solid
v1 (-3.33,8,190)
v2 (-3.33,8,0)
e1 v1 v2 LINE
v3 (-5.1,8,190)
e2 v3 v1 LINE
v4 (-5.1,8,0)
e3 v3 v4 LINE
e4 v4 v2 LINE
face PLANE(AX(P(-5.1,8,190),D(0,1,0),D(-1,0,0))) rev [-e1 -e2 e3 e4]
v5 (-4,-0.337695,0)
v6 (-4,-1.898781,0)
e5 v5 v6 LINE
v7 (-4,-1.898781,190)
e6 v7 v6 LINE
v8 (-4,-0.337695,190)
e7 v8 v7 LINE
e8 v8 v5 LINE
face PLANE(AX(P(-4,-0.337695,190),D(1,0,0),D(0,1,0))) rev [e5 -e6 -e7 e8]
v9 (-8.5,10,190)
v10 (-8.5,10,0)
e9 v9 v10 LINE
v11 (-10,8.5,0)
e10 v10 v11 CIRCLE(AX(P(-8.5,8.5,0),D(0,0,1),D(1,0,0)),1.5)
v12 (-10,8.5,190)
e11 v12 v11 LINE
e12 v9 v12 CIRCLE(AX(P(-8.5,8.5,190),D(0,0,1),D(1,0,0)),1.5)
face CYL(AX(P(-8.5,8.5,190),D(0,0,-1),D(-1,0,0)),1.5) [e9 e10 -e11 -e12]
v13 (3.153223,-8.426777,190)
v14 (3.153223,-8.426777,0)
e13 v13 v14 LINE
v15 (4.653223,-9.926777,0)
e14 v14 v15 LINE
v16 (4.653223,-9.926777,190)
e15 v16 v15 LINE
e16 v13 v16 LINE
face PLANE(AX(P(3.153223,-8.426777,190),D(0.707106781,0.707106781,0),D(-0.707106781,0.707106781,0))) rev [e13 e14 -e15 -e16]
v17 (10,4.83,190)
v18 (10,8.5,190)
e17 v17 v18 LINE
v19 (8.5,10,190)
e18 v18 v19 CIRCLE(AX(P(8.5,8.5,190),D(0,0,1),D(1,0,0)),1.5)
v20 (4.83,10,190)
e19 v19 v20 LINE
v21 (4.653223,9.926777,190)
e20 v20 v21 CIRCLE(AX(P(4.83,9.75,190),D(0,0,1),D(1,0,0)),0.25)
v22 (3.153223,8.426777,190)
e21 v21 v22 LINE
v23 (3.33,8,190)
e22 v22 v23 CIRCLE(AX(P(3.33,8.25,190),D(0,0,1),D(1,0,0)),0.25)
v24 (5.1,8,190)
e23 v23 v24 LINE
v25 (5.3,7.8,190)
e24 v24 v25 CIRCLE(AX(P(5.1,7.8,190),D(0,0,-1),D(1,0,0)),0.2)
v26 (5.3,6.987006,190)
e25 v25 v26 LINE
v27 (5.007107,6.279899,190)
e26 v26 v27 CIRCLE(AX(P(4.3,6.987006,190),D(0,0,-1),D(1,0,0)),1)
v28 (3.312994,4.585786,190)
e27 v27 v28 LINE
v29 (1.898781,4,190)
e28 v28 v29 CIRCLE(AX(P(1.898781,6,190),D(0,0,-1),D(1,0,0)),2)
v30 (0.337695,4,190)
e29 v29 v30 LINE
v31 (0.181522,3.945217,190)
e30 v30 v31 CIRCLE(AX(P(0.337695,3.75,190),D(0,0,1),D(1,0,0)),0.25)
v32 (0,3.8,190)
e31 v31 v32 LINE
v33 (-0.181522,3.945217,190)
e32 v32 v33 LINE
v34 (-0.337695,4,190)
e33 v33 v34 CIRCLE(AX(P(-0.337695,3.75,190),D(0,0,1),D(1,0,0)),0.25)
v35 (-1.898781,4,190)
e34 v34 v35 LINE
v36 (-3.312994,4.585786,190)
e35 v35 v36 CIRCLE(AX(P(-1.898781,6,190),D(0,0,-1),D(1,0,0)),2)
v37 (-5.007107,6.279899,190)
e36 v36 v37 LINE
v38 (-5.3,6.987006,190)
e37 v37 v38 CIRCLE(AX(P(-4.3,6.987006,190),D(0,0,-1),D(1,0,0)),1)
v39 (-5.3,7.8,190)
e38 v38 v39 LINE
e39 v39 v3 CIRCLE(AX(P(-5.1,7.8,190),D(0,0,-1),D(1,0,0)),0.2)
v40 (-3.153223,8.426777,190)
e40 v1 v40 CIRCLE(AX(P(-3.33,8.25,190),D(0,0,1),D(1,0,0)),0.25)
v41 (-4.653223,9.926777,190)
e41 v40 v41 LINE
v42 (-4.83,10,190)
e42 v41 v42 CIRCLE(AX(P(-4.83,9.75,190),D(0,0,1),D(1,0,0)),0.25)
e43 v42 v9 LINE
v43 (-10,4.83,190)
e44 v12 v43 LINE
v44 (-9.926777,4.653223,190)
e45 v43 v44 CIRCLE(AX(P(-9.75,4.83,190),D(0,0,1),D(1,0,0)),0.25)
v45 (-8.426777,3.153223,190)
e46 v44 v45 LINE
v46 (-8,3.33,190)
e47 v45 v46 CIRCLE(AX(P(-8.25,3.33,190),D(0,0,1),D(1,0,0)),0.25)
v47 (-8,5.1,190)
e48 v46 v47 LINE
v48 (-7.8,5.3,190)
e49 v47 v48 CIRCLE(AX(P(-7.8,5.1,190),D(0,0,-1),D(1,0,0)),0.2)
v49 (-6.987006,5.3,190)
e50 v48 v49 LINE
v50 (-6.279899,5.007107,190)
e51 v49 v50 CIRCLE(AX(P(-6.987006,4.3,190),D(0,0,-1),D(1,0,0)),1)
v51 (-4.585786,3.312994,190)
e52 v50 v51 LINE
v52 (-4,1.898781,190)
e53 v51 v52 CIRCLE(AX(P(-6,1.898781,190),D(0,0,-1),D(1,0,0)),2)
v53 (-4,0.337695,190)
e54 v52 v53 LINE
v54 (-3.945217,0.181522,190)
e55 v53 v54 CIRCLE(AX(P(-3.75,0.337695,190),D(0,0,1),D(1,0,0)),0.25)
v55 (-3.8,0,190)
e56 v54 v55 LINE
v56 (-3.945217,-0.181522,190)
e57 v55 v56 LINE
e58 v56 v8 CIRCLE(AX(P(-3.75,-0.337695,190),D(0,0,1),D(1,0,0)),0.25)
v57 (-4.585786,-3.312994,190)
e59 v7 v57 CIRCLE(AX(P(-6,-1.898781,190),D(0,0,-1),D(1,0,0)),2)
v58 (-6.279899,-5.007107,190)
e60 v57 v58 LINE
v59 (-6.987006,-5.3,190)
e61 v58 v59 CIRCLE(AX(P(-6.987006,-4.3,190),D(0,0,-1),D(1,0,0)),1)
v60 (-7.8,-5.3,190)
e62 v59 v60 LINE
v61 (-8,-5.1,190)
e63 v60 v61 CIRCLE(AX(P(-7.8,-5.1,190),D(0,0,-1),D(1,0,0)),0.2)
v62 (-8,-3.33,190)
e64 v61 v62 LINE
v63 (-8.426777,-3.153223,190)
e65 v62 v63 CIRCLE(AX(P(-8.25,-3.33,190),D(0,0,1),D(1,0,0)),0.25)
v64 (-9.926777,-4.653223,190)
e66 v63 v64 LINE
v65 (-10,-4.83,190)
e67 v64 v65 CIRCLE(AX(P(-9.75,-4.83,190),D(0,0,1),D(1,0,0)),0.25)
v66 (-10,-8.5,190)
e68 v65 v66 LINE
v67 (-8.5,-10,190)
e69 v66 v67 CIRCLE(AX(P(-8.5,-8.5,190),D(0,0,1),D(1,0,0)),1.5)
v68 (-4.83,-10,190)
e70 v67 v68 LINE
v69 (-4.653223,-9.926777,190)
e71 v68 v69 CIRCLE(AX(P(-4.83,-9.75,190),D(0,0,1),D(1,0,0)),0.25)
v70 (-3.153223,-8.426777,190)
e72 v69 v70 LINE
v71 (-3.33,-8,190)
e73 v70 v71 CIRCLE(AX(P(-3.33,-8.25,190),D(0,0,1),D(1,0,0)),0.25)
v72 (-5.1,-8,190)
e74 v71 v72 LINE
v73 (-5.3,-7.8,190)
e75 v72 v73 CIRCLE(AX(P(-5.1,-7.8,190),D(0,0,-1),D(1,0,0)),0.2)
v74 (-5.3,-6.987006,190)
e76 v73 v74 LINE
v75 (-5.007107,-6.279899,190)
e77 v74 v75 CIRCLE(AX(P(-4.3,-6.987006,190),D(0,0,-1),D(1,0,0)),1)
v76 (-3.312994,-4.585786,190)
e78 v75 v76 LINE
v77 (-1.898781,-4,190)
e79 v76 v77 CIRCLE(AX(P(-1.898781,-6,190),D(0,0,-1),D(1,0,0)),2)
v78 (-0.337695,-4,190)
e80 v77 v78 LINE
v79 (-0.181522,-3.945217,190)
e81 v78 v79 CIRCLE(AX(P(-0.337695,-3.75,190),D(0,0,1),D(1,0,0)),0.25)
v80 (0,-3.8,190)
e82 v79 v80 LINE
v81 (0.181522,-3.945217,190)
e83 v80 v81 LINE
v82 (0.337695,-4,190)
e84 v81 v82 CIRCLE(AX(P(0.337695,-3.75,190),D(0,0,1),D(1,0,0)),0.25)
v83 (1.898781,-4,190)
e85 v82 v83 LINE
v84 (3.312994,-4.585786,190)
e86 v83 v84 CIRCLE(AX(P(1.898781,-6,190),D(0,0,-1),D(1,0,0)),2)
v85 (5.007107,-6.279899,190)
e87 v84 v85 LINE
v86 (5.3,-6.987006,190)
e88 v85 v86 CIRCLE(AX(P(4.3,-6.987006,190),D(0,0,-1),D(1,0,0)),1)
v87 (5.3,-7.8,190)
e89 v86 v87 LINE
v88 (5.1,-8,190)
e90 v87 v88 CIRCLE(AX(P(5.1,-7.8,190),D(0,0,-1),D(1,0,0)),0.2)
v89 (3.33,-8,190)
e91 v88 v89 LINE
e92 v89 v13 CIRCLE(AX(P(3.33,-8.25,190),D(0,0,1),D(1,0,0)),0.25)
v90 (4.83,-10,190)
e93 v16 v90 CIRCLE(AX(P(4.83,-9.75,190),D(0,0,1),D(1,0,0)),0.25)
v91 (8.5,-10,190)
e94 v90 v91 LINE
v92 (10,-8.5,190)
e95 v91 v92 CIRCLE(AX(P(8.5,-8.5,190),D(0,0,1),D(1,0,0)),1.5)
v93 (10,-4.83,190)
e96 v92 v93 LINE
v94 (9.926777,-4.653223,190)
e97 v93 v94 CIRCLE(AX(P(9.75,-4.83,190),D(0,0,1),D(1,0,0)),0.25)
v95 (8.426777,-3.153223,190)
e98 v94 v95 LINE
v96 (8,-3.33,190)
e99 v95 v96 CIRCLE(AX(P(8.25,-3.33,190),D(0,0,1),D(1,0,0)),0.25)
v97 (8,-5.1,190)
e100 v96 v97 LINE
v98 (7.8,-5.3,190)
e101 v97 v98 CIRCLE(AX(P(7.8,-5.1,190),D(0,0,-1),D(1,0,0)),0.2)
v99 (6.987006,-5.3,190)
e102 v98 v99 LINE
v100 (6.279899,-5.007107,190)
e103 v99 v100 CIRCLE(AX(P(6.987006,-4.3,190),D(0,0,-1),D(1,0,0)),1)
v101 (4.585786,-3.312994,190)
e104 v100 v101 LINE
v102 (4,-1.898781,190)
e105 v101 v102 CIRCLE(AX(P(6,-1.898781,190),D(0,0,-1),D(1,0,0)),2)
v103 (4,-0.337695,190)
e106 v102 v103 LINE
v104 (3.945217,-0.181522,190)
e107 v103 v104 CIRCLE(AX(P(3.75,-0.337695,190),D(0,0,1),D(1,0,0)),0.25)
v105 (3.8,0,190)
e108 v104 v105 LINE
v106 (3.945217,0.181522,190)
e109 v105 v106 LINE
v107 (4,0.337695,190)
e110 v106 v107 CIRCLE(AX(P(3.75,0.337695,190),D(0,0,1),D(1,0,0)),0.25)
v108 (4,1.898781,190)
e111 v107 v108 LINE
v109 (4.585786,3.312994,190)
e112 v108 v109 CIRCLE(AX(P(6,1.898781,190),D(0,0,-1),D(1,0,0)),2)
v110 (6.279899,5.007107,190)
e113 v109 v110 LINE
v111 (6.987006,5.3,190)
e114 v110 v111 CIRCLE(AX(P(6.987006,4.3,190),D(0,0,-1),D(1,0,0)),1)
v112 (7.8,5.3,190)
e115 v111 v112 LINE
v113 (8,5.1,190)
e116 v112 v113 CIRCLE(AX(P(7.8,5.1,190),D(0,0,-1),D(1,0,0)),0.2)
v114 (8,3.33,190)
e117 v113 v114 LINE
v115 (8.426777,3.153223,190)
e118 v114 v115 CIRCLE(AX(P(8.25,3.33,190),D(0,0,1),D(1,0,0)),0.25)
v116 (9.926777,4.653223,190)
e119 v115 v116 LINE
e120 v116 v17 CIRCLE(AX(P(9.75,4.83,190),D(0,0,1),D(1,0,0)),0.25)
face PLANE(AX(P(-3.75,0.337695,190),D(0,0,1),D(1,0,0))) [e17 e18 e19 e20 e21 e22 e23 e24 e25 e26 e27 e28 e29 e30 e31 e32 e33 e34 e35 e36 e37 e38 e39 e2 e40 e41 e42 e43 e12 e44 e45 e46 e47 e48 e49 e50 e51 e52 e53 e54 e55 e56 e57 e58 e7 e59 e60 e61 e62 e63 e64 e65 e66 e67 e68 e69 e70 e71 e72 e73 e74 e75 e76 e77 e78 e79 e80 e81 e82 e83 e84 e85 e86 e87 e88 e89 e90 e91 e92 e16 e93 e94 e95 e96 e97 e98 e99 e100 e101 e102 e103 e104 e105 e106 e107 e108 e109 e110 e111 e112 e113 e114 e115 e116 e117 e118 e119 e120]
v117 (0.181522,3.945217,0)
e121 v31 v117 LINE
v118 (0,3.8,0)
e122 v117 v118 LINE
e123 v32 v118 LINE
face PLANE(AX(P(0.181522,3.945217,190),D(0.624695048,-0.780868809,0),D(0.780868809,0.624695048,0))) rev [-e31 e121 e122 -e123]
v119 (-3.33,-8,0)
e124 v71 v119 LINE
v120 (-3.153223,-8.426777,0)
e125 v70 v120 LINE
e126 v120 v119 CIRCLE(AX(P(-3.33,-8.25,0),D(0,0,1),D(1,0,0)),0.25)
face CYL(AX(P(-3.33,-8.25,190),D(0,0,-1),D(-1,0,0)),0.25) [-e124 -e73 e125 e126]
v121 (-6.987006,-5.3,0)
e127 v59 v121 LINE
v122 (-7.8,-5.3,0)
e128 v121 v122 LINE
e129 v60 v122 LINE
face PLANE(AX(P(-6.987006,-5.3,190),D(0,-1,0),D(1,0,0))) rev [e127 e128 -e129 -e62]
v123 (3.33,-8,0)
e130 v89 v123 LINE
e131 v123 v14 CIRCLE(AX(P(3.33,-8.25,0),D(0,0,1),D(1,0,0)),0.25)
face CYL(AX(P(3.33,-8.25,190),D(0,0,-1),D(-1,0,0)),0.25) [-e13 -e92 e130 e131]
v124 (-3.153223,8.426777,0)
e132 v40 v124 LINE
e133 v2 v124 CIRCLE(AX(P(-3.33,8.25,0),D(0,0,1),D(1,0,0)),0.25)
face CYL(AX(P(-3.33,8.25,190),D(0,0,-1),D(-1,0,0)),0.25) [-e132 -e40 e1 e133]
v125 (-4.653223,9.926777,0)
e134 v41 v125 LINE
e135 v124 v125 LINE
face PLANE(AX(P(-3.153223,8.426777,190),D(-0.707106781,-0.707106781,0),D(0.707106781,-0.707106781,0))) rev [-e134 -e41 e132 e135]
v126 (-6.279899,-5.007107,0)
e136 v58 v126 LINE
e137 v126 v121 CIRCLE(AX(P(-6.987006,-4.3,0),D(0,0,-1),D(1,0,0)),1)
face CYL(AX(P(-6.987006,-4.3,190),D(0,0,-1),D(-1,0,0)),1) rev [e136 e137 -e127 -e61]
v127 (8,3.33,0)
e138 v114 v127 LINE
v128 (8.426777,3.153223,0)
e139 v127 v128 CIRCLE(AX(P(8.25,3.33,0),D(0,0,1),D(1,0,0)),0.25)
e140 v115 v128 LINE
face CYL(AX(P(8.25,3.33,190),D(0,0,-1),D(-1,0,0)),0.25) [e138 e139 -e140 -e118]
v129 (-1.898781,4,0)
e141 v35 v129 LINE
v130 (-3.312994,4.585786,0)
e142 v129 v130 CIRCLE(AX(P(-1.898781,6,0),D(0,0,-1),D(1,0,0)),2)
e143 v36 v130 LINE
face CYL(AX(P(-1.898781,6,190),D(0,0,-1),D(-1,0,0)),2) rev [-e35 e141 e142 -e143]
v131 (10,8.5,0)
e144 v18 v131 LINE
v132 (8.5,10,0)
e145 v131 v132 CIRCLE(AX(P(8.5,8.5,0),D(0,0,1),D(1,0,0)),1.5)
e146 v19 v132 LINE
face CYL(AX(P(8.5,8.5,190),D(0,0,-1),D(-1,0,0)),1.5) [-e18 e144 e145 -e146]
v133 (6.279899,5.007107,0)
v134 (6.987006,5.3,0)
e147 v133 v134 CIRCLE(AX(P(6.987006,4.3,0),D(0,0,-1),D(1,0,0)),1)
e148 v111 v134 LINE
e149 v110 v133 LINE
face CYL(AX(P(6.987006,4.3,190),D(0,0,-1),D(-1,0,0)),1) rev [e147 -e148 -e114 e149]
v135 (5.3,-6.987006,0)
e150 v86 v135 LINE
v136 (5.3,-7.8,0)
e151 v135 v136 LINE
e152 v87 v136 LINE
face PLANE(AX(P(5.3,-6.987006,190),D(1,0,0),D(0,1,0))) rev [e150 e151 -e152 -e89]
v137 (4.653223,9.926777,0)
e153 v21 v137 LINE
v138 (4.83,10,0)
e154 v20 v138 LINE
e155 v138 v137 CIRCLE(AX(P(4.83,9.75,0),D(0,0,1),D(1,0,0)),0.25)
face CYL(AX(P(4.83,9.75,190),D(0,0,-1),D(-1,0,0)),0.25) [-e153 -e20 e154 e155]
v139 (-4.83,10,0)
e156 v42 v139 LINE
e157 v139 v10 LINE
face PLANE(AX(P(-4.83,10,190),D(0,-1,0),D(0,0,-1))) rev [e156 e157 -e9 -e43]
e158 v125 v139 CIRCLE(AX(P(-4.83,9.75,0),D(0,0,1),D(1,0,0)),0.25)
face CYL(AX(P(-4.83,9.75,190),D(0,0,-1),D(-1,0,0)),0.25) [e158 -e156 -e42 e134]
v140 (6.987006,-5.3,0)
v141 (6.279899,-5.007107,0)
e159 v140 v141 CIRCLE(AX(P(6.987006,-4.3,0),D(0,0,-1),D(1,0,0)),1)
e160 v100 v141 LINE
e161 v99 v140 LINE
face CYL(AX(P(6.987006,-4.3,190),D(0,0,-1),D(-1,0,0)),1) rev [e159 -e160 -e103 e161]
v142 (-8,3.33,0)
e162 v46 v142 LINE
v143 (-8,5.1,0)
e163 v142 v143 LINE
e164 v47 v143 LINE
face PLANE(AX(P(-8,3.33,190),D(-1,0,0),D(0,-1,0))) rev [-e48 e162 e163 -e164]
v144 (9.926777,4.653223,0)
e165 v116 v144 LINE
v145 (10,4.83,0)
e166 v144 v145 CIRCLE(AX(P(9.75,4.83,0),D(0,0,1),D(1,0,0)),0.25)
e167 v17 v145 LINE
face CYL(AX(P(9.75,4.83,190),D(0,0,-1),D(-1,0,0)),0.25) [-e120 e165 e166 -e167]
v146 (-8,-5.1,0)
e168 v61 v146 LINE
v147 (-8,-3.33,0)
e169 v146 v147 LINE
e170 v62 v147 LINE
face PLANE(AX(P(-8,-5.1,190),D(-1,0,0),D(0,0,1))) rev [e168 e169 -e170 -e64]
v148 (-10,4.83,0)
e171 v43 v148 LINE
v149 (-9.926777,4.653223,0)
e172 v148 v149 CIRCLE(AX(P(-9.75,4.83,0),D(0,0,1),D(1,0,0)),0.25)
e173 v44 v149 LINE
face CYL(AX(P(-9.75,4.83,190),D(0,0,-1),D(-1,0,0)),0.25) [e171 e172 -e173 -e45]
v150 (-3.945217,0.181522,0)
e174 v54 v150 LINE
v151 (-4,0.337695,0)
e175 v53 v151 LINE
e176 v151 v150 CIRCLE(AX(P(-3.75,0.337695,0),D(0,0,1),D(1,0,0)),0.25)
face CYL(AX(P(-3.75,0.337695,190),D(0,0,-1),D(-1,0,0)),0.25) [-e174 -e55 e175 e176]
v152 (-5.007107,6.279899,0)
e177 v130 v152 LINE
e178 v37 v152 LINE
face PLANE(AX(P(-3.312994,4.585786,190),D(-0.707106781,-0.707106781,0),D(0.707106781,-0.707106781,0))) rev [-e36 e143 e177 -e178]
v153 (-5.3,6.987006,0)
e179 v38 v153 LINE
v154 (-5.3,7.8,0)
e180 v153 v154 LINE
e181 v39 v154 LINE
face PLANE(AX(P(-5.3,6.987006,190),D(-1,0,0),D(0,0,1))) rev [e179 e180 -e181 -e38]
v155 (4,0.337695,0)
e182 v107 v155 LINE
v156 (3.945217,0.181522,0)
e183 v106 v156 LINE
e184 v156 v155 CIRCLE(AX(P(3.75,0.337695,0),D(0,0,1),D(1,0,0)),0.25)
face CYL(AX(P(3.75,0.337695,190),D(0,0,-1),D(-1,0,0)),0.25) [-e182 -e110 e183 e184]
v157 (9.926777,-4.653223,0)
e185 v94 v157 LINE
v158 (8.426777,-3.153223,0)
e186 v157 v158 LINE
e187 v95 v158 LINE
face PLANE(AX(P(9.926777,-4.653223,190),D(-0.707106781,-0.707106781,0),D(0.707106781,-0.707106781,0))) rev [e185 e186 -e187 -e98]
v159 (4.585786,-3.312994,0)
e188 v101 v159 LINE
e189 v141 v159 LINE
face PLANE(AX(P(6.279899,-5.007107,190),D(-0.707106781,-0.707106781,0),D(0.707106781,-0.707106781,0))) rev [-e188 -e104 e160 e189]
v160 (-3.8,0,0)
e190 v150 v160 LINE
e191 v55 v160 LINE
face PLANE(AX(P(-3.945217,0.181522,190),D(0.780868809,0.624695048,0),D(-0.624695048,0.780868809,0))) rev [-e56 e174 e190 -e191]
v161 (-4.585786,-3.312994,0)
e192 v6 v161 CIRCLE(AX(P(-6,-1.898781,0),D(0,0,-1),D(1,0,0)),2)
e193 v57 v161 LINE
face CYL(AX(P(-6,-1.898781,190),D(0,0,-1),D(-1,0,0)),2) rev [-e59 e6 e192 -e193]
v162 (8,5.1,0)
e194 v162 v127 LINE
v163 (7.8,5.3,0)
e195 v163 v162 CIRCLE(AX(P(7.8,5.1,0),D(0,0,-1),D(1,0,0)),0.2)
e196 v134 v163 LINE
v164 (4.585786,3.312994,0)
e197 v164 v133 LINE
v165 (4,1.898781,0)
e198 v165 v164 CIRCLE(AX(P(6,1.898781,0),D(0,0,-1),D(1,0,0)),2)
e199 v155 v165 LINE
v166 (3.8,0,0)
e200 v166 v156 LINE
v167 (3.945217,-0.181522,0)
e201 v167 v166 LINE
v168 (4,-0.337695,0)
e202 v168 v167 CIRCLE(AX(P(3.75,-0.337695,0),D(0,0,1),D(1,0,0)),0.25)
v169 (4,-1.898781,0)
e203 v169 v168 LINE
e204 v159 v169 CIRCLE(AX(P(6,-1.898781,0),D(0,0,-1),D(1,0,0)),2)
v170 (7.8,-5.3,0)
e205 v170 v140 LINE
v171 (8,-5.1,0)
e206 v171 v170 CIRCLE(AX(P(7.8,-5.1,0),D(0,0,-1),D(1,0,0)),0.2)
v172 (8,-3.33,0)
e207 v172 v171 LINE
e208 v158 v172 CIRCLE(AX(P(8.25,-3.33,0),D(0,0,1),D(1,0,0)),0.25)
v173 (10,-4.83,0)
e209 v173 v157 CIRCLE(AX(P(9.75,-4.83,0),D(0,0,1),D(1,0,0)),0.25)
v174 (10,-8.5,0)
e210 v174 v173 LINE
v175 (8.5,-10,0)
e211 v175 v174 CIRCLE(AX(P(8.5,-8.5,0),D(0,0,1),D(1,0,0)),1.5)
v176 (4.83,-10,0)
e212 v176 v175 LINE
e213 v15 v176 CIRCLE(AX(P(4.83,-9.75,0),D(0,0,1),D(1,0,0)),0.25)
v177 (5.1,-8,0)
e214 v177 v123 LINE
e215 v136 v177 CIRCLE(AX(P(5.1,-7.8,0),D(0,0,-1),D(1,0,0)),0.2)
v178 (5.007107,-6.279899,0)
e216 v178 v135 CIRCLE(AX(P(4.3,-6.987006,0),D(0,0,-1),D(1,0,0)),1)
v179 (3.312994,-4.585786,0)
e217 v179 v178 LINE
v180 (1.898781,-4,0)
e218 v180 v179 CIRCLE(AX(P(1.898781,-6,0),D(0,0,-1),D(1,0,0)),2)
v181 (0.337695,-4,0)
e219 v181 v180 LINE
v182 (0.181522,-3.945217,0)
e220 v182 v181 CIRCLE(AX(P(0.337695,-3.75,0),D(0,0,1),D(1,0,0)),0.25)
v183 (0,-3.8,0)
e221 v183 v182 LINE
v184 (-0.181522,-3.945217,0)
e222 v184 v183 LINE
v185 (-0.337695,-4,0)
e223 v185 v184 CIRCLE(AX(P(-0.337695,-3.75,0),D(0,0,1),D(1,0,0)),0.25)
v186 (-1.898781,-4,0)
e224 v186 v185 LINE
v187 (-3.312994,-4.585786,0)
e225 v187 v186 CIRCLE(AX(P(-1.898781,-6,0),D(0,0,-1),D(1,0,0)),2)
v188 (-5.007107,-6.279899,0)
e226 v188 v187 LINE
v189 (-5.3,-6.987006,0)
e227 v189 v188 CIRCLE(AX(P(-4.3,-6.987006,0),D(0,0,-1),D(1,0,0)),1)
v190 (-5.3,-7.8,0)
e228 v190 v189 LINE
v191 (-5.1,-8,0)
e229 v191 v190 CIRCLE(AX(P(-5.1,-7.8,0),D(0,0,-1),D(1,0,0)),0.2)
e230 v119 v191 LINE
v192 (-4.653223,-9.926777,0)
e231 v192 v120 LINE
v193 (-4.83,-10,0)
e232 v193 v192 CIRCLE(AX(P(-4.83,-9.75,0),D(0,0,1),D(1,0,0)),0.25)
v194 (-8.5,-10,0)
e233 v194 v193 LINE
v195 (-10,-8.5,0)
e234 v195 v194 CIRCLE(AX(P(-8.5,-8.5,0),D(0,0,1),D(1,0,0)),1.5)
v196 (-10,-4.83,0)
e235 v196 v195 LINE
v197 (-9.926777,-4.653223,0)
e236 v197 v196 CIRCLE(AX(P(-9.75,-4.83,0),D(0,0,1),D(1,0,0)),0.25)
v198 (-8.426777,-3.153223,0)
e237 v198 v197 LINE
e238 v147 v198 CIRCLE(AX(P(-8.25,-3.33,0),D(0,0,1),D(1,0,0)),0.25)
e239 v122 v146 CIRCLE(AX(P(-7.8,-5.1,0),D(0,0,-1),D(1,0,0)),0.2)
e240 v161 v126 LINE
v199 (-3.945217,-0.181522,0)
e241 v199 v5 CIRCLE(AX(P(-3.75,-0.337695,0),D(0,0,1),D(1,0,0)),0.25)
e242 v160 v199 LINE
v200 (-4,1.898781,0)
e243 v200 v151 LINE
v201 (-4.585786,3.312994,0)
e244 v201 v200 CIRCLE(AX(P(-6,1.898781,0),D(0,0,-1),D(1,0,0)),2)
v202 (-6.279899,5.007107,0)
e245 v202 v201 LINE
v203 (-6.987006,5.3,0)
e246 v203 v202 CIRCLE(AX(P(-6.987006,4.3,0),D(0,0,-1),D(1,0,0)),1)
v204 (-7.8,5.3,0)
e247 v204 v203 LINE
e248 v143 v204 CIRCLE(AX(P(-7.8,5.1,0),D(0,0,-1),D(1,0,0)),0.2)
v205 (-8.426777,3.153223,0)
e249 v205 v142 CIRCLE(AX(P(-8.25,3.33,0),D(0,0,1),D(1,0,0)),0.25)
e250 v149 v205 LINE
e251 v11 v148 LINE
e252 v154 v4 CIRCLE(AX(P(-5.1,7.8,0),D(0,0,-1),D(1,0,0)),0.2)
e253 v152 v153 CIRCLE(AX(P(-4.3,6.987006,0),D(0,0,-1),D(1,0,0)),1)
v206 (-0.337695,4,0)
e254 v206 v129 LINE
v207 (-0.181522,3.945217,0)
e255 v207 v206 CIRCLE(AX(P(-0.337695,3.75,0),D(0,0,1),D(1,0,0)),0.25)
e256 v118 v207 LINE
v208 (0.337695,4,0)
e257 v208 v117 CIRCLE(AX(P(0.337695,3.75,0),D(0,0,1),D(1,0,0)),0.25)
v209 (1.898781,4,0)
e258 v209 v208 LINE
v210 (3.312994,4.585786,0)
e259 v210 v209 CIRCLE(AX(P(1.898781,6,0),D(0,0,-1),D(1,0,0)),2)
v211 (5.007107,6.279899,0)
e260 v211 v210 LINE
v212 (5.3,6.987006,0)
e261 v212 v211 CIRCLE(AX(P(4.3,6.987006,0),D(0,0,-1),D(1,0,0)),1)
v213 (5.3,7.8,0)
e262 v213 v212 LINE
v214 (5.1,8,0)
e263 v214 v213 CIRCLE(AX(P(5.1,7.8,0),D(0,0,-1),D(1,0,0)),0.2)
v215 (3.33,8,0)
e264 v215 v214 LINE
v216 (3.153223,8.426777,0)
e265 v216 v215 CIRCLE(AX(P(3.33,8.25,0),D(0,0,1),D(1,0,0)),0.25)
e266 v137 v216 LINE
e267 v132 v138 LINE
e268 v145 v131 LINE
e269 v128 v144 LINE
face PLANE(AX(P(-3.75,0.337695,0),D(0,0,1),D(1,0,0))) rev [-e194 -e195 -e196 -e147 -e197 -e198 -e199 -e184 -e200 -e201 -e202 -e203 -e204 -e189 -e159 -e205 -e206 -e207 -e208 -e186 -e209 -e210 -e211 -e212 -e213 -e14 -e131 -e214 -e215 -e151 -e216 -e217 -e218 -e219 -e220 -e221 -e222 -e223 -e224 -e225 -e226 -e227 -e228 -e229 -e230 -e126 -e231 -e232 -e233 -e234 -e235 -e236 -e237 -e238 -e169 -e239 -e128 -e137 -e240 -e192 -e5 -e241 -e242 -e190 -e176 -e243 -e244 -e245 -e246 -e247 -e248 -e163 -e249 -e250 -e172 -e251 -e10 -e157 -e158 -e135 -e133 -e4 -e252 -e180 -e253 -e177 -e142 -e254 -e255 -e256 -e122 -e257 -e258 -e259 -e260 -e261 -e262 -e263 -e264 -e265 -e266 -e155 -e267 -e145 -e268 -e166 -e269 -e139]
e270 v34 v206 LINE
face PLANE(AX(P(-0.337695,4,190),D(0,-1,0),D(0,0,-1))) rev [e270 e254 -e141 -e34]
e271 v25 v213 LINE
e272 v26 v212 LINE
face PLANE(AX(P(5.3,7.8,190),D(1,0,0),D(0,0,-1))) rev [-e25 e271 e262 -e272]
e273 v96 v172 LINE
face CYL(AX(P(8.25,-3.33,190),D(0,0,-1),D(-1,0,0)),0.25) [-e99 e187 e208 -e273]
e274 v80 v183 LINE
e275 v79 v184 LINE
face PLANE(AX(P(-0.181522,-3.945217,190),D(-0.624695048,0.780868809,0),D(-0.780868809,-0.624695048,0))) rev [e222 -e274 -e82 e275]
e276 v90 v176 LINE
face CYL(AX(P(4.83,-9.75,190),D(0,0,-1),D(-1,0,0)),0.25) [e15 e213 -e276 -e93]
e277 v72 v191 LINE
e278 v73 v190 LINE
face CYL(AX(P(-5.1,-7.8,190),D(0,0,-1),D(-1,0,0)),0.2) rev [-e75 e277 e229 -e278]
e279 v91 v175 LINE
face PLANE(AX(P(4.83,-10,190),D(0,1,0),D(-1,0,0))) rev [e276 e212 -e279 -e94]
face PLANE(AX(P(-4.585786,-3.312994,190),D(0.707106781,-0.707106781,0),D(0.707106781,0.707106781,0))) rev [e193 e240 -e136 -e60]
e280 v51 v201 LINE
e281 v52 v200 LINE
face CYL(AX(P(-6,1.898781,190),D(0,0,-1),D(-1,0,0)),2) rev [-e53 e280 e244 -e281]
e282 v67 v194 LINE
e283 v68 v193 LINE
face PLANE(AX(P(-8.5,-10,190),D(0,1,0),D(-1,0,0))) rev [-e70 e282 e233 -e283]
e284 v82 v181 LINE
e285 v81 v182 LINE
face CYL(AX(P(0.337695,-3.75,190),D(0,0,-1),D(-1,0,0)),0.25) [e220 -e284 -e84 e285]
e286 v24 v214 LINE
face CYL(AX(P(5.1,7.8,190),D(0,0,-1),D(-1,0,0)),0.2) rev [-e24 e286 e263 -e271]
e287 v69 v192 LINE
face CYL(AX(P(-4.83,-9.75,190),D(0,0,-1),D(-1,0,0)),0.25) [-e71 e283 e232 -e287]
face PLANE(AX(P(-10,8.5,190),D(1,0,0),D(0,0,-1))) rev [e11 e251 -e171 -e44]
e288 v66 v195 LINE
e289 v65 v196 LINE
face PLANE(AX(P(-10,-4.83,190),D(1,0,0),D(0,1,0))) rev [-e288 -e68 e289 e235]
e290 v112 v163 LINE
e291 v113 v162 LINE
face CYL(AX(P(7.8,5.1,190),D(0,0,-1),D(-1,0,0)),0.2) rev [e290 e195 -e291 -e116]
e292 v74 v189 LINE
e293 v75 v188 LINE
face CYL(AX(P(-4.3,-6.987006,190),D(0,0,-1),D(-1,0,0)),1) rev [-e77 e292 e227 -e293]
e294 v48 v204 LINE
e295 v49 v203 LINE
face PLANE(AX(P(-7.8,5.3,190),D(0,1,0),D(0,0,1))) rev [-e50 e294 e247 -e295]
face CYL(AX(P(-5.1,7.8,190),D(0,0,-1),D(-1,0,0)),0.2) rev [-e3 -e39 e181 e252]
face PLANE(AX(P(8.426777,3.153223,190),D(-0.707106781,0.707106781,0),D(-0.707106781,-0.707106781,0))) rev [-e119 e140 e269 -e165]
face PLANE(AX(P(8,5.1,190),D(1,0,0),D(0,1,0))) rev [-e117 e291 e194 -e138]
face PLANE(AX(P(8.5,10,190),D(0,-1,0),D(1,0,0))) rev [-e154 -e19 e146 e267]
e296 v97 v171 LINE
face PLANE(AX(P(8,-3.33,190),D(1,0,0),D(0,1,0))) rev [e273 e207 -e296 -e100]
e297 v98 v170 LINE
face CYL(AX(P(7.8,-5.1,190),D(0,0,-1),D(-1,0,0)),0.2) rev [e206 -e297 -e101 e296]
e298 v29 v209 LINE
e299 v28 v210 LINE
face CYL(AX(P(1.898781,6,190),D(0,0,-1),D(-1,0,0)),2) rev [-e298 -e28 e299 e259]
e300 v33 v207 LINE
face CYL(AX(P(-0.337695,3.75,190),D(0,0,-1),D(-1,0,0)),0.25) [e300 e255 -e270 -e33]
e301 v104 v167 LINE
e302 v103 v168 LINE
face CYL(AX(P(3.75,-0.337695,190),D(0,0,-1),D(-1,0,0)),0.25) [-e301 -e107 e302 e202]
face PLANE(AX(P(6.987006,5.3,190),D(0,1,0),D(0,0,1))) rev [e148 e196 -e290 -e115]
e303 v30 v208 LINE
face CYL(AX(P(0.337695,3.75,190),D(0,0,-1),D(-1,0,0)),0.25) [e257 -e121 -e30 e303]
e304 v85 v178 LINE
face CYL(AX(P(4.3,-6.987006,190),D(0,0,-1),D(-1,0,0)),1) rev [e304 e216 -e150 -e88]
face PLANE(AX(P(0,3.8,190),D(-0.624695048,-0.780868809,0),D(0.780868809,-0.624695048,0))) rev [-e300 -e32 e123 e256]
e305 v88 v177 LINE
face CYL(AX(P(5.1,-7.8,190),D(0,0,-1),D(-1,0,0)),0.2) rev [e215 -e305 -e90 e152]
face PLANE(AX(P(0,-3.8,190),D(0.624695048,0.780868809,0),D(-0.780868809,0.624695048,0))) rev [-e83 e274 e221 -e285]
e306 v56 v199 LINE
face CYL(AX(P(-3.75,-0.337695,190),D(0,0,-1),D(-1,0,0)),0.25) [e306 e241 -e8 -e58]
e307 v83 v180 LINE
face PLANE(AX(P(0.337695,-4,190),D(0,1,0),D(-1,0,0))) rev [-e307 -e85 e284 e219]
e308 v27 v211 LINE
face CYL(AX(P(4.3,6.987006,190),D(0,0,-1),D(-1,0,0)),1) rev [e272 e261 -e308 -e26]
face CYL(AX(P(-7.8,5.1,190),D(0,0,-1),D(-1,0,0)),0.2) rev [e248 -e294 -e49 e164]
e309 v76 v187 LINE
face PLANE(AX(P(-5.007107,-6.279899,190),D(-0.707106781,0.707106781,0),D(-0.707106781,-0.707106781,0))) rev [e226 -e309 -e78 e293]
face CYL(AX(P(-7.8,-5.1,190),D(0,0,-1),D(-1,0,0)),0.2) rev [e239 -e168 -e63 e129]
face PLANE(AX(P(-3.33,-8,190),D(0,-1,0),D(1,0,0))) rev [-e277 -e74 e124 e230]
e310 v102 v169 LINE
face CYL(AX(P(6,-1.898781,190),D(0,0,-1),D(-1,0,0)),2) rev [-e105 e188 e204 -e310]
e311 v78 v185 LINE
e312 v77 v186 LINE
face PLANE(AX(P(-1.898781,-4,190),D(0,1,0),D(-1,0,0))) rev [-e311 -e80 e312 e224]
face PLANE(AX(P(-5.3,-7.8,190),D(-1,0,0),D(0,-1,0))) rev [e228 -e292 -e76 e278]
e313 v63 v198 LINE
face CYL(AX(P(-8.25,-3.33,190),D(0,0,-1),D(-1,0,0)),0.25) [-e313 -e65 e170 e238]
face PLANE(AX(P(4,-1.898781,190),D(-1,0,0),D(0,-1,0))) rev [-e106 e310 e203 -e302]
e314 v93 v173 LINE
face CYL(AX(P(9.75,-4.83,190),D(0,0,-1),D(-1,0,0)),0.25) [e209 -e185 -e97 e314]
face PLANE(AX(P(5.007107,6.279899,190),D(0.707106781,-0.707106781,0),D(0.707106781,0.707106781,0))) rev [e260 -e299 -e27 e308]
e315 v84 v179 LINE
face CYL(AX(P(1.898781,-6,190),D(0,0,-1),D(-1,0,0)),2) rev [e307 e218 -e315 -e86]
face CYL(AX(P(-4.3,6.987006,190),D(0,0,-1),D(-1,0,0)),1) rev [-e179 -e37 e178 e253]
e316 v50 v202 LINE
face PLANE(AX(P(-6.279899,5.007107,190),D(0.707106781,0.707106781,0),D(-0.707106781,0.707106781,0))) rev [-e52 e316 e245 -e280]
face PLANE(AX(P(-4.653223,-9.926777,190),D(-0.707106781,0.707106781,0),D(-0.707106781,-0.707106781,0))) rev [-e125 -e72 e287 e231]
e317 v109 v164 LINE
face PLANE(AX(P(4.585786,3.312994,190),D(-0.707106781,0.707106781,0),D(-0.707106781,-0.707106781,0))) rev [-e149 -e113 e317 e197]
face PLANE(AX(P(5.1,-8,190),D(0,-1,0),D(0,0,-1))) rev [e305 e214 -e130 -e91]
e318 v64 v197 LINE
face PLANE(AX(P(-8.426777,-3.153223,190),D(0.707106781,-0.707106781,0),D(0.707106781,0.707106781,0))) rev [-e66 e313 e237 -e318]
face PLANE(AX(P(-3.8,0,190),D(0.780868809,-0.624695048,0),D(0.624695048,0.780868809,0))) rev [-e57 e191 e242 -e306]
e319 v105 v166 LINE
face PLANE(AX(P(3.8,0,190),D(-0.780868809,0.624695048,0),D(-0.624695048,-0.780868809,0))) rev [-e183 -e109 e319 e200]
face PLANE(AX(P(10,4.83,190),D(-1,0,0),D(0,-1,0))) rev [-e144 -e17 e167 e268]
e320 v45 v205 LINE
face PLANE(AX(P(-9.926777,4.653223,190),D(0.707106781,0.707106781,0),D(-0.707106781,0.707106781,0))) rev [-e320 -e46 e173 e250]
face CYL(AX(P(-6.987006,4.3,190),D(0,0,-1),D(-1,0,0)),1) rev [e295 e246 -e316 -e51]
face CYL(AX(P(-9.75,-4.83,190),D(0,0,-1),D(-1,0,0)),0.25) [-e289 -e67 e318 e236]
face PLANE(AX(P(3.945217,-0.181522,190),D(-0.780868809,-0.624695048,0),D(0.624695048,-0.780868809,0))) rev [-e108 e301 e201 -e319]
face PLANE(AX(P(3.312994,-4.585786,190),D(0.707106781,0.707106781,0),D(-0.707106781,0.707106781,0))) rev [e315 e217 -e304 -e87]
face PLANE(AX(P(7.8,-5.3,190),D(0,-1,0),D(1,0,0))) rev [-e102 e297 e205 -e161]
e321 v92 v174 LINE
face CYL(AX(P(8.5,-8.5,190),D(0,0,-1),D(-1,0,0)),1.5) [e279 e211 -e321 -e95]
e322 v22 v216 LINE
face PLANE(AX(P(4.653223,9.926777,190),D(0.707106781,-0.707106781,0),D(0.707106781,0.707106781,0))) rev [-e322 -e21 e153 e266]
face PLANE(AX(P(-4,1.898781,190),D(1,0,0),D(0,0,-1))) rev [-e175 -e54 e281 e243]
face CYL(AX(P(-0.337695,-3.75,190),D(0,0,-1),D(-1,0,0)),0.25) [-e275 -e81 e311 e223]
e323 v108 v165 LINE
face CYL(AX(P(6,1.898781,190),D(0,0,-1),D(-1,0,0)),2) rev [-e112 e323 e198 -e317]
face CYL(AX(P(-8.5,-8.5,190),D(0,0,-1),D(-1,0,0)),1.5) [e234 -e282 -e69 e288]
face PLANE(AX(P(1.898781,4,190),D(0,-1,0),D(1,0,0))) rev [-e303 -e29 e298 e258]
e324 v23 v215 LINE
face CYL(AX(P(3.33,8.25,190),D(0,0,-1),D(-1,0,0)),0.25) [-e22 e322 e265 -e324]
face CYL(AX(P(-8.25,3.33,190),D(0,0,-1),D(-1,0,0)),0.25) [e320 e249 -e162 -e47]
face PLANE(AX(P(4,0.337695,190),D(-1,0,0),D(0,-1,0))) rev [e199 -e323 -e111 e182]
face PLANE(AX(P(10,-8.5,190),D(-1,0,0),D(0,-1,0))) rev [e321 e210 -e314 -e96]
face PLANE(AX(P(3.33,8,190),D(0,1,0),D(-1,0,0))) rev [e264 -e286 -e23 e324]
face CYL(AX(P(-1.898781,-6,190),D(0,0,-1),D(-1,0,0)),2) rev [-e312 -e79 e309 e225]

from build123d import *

# Parameters (mm, degrees)
EXTRUDE_1_DEPTH = 190


# Read off the part's stored shape, not the designer's step: 222 Конструкционный профиль 20х20-1-surface1
with BuildPart() as part:
    # Эскиз1 → Бобышка-Вытянуть1 (new body)
    with BuildSketch(Plane.XY):
        with BuildLine():
            Line((-3.945217202, 0.181521503), (-3.8, 0))
            Line((-3.8, 0), (-3.945217202, -0.181521503))
            ThreePointArc((-3.945217202, -0.181521503), (-3.98590708, -0.254943529), (-4, -0.337695265))
            Line((-4, -0.337695265), (-4, -1.898780669))
            ThreePointArc((-4, -1.898780669), (-4.152240935, -2.664147534), (-4.585786438, -3.312994231))
            Line((-4.585786438, -3.312994231), (-6.279898987, -5.007106781))
            ThreePointArc((-6.279898987, -5.007106781), (-6.604322336, -5.223879533), (-6.987005769, -5.3))
            Line((-6.987005769, -5.3), (-7.8, -5.3))
            ThreePointArc((-7.8, -5.3), (-7.941421356, -5.241421356), (-8, -5.1))
            Line((-8, -5.1), (-8, -3.33))
            ThreePointArc((-8, -3.33), (-8.154329142, -3.099030117), (-8.426776695, -3.153223305))
            Line((-8.426776695, -3.153223305), (-9.926776695, -4.653223305))
            ThreePointArc((-9.926776695, -4.653223305), (-9.980969883, -4.734329142), (-10, -4.83))
            Line((-10, -4.83), (-10, -8.5))
            ThreePointArc((-10, -8.5), (-9.560660172, -9.560660172), (-8.5, -10))
            Line((-8.5, -10), (-4.83, -10))
            ThreePointArc((-4.83, -10), (-4.734329142, -9.980969883), (-4.653223305, -9.926776695))
            Line((-4.653223305, -9.926776695), (-3.153223305, -8.426776695))
            ThreePointArc((-3.153223305, -8.426776695), (-3.099030117, -8.154329142), (-3.33, -8))
            Line((-3.33, -8), (-5.1, -8))
            ThreePointArc((-5.1, -8), (-5.241421356, -7.941421356), (-5.3, -7.8))
            Line((-5.3, -7.8), (-5.3, -6.987005769))
            ThreePointArc((-5.3, -6.987005769), (-5.223879533, -6.604322336), (-5.007106781, -6.279898987))
            Line((-5.007106781, -6.279898987), (-3.312994231, -4.585786438))
            ThreePointArc((-3.312994231, -4.585786438), (-2.664147534, -4.152240935), (-1.898780669, -4))
            Line((-1.898780669, -4), (-0.337695265, -4))
            ThreePointArc((-0.337695265, -4), (-0.254943529, -3.98590708), (-0.181521503, -3.945217202))
            Line((-0.181521503, -3.945217202), (0, -3.8))
            Line((0, -3.8), (0.181521503, -3.945217202))
            ThreePointArc((0.181521503, -3.945217202), (0.254943529, -3.98590708), (0.337695265, -4))
            Line((0.337695265, -4), (1.898780669, -4))
            ThreePointArc((1.898780669, -4), (2.664147534, -4.152240935), (3.312994231, -4.585786438))
            Line((3.312994231, -4.585786438), (5.007106781, -6.279898987))
            ThreePointArc((5.007106781, -6.279898987), (5.223879533, -6.604322336), (5.3, -6.987005769))
            Line((5.3, -6.987005769), (5.3, -7.8))
            ThreePointArc((5.3, -7.8), (5.241421356, -7.941421356), (5.1, -8))
            Line((5.1, -8), (3.33, -8))
            ThreePointArc((3.33, -8), (3.099030117, -8.154329142), (3.153223305, -8.426776695))
            Line((3.153223305, -8.426776695), (4.653223305, -9.926776695))
            ThreePointArc((4.653223305, -9.926776695), (4.734329142, -9.980969883), (4.83, -10))
            Line((4.83, -10), (8.5, -10))
            ThreePointArc((8.5, -10), (9.560660172, -9.560660172), (10, -8.5))
            Line((10, -8.5), (10, -4.83))
            ThreePointArc((10, -4.83), (9.980969883, -4.734329142), (9.926776695, -4.653223305))
            Line((9.926776695, -4.653223305), (8.426776695, -3.153223305))
            ThreePointArc((8.426776695, -3.153223305), (8.154329142, -3.099030117), (8, -3.33))
            Line((8, -3.33), (8, -5.1))
            ThreePointArc((8, -5.1), (7.941421356, -5.241421356), (7.8, -5.3))
            Line((7.8, -5.3), (6.987005769, -5.3))
            ThreePointArc((6.987005769, -5.3), (6.604322336, -5.223879533), (6.279898987, -5.007106781))
            Line((6.279898987, -5.007106781), (4.585786438, -3.312994231))
            ThreePointArc((4.585786438, -3.312994231), (4.152240935, -2.664147534), (4, -1.898780669))
            Line((4, -1.898780669), (4, -0.337695265))
            ThreePointArc((4, -0.337695265), (3.98590708, -0.254943529), (3.945217202, -0.181521503))
            Line((3.945217202, -0.181521503), (3.8, 0))
            Line((3.8, 0), (3.945217202, 0.181521503))
            ThreePointArc((3.945217202, 0.181521503), (3.98590708, 0.254943529), (4, 0.337695265))
            Line((4, 0.337695265), (4, 1.898780669))
            ThreePointArc((4, 1.898780669), (4.152240935, 2.664147534), (4.585786438, 3.312994231))
            Line((4.585786438, 3.312994231), (6.279898987, 5.007106781))
            ThreePointArc((6.279898987, 5.007106781), (6.604322336, 5.223879533), (6.987005769, 5.3))
            Line((6.987005769, 5.3), (7.8, 5.3))
            ThreePointArc((7.8, 5.3), (7.941421356, 5.241421356), (8, 5.1))
            Line((8, 5.1), (8, 3.33))
            ThreePointArc((8, 3.33), (8.154329142, 3.099030117), (8.426776695, 3.153223305))
            Line((8.426776695, 3.153223305), (9.926776695, 4.653223305))
            ThreePointArc((9.926776695, 4.653223305), (9.980969883, 4.734329142), (10, 4.83))
            Line((10, 4.83), (10, 8.5))
            ThreePointArc((10, 8.5), (9.560660172, 9.560660172), (8.5, 10))
            Line((8.5, 10), (4.83, 10))
            ThreePointArc((4.83, 10), (4.734329142, 9.980969883), (4.653223305, 9.926776695))
            Line((4.653223305, 9.926776695), (3.153223305, 8.426776695))
            ThreePointArc((3.153223305, 8.426776695), (3.099030117, 8.154329142), (3.33, 8))
            Line((3.33, 8), (5.1, 8))
            ThreePointArc((5.1, 8), (5.241421356, 7.941421356), (5.3, 7.8))
            Line((5.3, 7.8), (5.3, 6.987005769))
            ThreePointArc((5.3, 6.987005769), (5.223879533, 6.604322336), (5.007106781, 6.279898987))
            Line((5.007106781, 6.279898987), (3.312994231, 4.585786438))
            ThreePointArc((3.312994231, 4.585786438), (2.664147534, 4.152240935), (1.898780669, 4))
            Line((1.898780669, 4), (0.337695265, 4))
            ThreePointArc((0.337695265, 4), (0.254943529, 3.98590708), (0.181521503, 3.945217202))
            Line((0.181521503, 3.945217202), (0, 3.8))
            Line((0, 3.8), (-0.181521503, 3.945217202))
            ThreePointArc((-0.181521503, 3.945217202), (-0.254943529, 3.98590708), (-0.337695265, 4))
            Line((-0.337695265, 4), (-1.898780669, 4))
            ThreePointArc((-1.898780669, 4), (-2.664147534, 4.152240935), (-3.312994231, 4.585786438))
            Line((-3.312994231, 4.585786438), (-5.007106781, 6.279898987))
            ThreePointArc((-5.007106781, 6.279898987), (-5.223879533, 6.604322336), (-5.3, 6.987005769))
            Line((-5.3, 6.987005769), (-5.3, 7.8))
            ThreePointArc((-5.3, 7.8), (-5.241421356, 7.941421356), (-5.1, 8))
            Line((-5.1, 8), (-3.33, 8))
            ThreePointArc((-3.33, 8), (-3.099030117, 8.154329142), (-3.153223305, 8.426776695))
            Line((-3.153223305, 8.426776695), (-4.653223305, 9.926776695))
            ThreePointArc((-4.653223305, 9.926776695), (-4.734329142, 9.980969883), (-4.83, 10))
            Line((-4.83, 10), (-8.5, 10))
            ThreePointArc((-8.5, 10), (-9.560660172, 9.560660172), (-10, 8.5))
            Line((-10, 8.5), (-10, 4.83))
            ThreePointArc((-10, 4.83), (-9.980969883, 4.734329142), (-9.926776695, 4.653223305))
            Line((-9.926776695, 4.653223305), (-8.426776695, 3.153223305))
            ThreePointArc((-8.426776695, 3.153223305), (-8.154329142, 3.099030117), (-8, 3.33))
            Line((-8, 3.33), (-8, 5.1))
            ThreePointArc((-8, 5.1), (-7.941421356, 5.241421356), (-7.8, 5.3))
            Line((-7.8, 5.3), (-6.987005769, 5.3))
            ThreePointArc((-6.987005769, 5.3), (-6.604322336, 5.223879533), (-6.279898987, 5.007106781))
            Line((-6.279898987, 5.007106781), (-4.585786438, 3.312994231))
            ThreePointArc((-4.585786438, 3.312994231), (-4.152240935, 2.664147534), (-4, 1.898780669))
            Line((-4, 1.898780669), (-4, 0.337695265))
            ThreePointArc((-4, 0.337695265), (-3.98590708, 0.254943529), (-3.945217202, 0.181521503))
        make_face()
    extrude(amount=EXTRUDE_1_DEPTH)


solid = part.part
